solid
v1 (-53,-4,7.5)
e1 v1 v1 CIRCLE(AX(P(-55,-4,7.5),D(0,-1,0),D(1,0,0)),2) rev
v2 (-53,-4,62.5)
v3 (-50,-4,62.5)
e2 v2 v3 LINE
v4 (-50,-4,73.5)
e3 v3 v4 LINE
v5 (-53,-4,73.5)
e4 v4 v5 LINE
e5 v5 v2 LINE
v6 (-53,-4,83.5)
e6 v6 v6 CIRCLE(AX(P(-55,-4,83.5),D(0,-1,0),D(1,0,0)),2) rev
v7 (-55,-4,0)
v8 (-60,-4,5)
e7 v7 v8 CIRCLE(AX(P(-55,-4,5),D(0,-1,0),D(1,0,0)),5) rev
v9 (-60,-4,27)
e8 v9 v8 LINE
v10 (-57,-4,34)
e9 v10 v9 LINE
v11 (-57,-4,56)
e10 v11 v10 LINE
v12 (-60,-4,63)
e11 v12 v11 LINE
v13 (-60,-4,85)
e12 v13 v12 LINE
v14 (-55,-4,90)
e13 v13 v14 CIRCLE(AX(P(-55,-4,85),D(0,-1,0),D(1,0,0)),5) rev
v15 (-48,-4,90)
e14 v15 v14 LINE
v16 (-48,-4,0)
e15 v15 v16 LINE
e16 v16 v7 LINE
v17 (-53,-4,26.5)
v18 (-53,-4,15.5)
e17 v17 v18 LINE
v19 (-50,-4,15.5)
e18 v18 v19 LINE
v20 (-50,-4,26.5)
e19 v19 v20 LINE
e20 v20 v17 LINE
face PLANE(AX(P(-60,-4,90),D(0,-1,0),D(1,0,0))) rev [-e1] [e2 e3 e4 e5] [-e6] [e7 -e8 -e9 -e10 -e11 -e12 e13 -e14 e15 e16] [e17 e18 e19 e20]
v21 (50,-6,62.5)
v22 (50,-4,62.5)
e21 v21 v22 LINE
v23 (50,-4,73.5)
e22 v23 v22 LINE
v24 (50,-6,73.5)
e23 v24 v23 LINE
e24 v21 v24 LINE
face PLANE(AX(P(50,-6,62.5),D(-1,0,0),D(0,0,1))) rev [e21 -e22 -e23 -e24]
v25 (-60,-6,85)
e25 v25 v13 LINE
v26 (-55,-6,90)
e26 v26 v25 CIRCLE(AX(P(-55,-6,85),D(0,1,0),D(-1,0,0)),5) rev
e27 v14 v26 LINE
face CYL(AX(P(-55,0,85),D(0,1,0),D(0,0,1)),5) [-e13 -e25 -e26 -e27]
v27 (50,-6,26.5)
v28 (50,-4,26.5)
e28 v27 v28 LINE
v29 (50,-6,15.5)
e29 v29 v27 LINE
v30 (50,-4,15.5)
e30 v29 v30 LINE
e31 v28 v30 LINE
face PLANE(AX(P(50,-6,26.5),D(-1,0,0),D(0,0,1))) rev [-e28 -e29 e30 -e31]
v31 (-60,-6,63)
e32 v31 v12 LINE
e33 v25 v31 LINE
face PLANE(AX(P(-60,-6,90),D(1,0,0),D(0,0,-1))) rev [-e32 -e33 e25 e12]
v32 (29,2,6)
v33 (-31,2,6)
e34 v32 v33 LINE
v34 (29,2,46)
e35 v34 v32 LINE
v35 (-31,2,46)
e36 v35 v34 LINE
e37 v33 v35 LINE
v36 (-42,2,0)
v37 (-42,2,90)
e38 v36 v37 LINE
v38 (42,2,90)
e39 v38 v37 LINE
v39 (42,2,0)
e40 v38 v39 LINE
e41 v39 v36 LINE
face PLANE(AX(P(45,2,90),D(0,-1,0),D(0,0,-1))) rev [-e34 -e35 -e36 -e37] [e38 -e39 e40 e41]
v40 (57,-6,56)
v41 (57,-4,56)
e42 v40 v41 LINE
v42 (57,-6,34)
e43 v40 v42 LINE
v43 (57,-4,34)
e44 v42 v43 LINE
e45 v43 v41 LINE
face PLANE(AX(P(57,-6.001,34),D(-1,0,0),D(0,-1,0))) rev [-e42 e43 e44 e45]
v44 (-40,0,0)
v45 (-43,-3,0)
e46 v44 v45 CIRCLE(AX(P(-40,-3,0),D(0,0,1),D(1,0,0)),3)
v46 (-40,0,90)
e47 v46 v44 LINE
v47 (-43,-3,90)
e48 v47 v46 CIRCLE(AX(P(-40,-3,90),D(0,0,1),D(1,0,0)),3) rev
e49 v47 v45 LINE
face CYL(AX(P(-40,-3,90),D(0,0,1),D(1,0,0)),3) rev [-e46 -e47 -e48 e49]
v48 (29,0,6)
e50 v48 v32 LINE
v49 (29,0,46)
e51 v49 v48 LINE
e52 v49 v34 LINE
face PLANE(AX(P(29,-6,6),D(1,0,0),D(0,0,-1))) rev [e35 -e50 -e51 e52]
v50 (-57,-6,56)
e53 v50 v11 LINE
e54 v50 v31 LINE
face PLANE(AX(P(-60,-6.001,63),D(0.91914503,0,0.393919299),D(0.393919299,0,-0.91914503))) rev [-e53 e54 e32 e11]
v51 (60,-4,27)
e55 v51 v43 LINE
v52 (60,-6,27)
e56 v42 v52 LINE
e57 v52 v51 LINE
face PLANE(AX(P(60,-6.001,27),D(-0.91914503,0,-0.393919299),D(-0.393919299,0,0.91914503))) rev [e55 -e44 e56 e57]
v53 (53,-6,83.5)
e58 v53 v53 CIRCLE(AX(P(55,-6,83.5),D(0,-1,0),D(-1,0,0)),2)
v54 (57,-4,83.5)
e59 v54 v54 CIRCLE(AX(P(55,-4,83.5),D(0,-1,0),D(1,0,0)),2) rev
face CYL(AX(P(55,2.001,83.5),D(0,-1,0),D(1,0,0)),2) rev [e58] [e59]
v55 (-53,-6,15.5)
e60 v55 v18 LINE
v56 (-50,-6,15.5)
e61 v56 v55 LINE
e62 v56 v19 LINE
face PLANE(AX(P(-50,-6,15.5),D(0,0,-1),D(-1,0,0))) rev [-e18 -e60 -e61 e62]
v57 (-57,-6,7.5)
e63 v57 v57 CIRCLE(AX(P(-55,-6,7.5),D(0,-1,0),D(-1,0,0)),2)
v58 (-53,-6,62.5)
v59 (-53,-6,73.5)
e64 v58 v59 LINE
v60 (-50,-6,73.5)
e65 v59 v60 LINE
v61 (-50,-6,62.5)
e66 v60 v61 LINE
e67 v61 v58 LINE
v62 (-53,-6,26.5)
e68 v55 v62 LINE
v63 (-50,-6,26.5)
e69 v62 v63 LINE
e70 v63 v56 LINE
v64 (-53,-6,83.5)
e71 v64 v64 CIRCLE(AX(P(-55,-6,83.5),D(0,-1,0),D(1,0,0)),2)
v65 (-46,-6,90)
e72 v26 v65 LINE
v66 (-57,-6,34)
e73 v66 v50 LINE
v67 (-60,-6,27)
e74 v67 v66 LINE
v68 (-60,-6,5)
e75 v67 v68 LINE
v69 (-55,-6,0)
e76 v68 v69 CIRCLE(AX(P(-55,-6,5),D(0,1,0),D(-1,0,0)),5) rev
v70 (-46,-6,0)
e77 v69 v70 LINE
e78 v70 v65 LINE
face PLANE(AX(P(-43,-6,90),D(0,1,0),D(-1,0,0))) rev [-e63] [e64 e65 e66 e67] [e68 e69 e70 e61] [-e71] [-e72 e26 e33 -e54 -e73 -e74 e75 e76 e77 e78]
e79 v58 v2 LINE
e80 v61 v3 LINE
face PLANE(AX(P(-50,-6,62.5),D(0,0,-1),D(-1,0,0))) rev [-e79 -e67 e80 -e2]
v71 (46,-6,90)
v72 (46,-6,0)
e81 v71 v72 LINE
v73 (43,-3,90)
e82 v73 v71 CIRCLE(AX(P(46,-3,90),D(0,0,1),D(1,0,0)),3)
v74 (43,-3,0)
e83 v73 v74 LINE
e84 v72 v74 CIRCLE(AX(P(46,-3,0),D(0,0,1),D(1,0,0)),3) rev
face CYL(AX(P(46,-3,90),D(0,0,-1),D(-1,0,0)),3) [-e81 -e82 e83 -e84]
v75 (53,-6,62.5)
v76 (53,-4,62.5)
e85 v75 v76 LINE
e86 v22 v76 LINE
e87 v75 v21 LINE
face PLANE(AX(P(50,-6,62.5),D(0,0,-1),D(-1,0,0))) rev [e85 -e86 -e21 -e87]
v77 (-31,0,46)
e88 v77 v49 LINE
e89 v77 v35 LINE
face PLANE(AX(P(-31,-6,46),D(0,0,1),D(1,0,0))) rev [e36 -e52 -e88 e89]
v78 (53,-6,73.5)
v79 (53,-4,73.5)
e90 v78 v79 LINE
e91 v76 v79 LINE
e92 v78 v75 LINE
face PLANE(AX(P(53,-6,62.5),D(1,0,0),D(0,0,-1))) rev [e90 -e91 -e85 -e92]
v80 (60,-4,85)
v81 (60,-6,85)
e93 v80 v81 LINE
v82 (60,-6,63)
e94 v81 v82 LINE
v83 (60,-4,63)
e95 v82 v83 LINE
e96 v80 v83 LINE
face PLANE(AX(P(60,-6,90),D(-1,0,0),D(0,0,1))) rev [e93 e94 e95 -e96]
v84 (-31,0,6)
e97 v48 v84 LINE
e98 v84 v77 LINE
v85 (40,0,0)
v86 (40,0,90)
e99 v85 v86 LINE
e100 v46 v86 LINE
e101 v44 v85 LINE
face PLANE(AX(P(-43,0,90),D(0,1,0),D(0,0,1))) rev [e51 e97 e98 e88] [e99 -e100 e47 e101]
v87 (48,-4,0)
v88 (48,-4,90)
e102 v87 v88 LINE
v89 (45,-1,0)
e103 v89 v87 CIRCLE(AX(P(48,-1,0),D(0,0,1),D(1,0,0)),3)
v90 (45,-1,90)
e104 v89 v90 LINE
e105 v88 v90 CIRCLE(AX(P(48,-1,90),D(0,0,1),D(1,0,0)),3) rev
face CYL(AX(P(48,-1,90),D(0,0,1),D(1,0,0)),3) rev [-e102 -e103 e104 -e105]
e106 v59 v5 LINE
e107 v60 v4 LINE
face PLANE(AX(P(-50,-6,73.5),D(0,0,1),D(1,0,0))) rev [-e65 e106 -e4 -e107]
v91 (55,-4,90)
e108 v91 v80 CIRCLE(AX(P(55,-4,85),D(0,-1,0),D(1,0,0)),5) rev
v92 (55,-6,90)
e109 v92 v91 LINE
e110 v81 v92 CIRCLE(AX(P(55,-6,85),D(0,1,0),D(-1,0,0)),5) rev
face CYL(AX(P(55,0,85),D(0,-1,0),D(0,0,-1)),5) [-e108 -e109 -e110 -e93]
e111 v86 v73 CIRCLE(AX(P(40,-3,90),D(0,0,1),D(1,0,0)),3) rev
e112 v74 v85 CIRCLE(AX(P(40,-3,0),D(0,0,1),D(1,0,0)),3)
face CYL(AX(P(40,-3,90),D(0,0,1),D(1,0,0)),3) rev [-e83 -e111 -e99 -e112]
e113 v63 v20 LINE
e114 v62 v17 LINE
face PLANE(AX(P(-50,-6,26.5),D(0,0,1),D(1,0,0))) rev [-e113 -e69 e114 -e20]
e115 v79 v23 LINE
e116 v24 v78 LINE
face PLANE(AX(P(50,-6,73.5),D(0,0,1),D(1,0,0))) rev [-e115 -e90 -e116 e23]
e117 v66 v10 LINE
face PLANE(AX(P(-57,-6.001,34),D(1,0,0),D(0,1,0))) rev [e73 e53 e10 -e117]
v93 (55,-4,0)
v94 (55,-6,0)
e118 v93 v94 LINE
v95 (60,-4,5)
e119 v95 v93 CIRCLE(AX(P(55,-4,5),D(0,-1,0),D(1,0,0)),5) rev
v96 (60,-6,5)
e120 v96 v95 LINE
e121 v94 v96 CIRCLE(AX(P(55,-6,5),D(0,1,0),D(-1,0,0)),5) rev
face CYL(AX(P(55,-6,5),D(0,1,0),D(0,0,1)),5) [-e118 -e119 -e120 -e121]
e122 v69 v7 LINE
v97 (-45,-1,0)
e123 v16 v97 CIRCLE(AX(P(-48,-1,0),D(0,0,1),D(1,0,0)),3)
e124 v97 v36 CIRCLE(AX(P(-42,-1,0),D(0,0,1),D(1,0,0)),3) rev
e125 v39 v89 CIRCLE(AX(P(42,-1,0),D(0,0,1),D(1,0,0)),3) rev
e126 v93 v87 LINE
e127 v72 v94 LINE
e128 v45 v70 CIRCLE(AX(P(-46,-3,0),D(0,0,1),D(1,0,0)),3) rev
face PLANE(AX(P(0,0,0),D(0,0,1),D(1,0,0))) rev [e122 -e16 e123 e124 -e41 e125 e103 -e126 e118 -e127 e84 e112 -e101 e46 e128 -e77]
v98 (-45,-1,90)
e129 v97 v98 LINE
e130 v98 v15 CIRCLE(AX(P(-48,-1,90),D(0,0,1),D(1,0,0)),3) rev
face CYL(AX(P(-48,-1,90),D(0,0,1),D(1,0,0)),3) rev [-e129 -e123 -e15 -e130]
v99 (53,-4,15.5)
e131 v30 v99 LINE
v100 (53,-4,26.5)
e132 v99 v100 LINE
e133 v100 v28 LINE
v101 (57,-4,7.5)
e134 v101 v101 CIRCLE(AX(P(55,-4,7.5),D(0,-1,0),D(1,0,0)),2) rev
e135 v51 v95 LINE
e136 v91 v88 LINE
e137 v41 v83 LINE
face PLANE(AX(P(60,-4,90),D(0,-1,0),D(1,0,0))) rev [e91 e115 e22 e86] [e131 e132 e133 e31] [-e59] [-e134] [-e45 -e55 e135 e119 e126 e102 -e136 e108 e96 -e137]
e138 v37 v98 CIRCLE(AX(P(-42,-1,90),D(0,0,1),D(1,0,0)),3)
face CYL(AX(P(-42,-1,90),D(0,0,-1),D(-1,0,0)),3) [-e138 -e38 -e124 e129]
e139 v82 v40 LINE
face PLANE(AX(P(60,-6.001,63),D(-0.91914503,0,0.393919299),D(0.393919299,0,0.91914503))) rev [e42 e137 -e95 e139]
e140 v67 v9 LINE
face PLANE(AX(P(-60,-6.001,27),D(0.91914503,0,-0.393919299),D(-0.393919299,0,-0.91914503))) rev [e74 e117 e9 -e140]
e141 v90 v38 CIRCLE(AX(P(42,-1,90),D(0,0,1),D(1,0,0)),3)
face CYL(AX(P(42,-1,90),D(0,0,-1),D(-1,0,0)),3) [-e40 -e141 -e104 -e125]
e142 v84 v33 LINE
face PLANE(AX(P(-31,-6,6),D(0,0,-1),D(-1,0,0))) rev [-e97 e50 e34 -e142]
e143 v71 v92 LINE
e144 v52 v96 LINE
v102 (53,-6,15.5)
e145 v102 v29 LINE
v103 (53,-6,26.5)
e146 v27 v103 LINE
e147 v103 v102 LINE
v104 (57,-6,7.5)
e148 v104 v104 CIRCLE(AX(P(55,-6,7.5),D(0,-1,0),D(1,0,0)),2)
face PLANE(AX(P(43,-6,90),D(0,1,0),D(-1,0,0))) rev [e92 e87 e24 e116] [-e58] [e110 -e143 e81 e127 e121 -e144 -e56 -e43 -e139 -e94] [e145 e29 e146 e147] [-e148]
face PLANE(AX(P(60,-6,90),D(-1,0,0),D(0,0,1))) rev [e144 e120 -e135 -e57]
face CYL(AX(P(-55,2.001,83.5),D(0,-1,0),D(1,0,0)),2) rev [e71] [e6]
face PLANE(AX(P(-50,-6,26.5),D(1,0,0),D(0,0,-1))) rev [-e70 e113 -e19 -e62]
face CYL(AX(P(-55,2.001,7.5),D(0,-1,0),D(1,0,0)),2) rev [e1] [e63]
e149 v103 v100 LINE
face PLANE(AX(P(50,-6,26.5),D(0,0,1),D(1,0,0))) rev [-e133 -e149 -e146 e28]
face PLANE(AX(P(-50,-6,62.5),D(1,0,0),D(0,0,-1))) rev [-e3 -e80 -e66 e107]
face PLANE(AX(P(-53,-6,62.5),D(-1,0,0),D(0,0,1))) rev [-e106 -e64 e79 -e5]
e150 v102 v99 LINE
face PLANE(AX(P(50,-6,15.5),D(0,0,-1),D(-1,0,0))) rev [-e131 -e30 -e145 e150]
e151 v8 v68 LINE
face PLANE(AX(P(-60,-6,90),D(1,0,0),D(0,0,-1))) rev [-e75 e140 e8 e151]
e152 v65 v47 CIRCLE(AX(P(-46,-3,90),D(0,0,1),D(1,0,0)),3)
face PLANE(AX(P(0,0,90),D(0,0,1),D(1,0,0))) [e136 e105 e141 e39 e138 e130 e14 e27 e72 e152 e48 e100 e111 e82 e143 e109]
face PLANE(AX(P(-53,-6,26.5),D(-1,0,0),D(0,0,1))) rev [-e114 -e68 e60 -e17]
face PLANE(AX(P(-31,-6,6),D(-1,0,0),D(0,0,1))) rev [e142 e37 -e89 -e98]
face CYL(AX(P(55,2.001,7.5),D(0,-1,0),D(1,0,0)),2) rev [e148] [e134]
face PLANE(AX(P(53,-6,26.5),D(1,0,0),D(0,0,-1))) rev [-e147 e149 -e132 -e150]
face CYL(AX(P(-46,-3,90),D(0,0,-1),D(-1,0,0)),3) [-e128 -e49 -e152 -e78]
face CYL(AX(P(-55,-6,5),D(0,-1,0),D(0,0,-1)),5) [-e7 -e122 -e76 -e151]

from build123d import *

# Parameters (mm, degrees)
EXTRUDE_1_DEPTH     = 90
SKETCH_2_W          = 3
SKETCH_2_H          = 11
SKETCH_2_W_2        = 60
SKETCH_2_H_2        = 40
CUT_EXTRUDE_1_DEPTH = 109.461974904
CUT_EXTRUDE_2_REACH = 110.462
SKETCH_3_R          = 2
FILLET_1_R          = 5
FILLET_2_DEPTH      = 90
FILLET_2_2_DEPTH    = 90
CUT_EXTRUDE_3_REACH = 110.333


with BuildPart() as part:
    # 草图1 → 凸台-拉伸1 (new body)
    with BuildSketch(Plane.XY):
        Polygon((-43, 0), (43, 0), (43, -6), (60, -6), (60, -4), (45, -4), (45, 2), (-45, 2), (-45, -4), (-60, -4), (-60, -6), (-43, -6), align=None)
    extrude(amount=EXTRUDE_1_DEPTH)

    # 草图2 → 切除-拉伸1 (cut, through all)
    with BuildSketch(Plane(origin=(0, 2, 0), x_dir=(1, 0, 0), z_dir=(0, 1, 0))):
        with Locations((51.5, -21)):
            Rectangle(SKETCH_2_W, SKETCH_2_H)
        with Locations((51.5, -68)):
            Rectangle(SKETCH_2_W, SKETCH_2_H)
        with Locations((-51.5, -21)):
            Rectangle(SKETCH_2_W, SKETCH_2_H)
        with Locations((-51.5, -68)):
            Rectangle(SKETCH_2_W, SKETCH_2_H)
        with Locations((-1, -26)):
            Rectangle(SKETCH_2_W_2, SKETCH_2_H_2)
    extrude(amount=-CUT_EXTRUDE_1_DEPTH, mode=Mode.SUBTRACT)

    # 草图3 → 切除-拉伸2 (cut, up to next)
    with BuildSketch(Plane.XZ.offset(6), mode=Mode.PRIVATE) as cut_extrude_2_sk1:
        with Locations((55, 7.5)):
            Circle(SKETCH_3_R)
    cut_extrude_2_tool1 = extrude(cut_extrude_2_sk1.sketch, amount=-CUT_EXTRUDE_2_REACH, mode=Mode.PRIVATE) & part.part
    # 草图3 → 切除-拉伸2 (cut, up to next)
    with BuildSketch(Plane.XZ.offset(6), mode=Mode.PRIVATE) as cut_extrude_2_sk2:
        with Locations((55, 83.5)):
            Circle(SKETCH_3_R)
    cut_extrude_2_tool2 = extrude(cut_extrude_2_sk2.sketch, amount=-CUT_EXTRUDE_2_REACH, mode=Mode.PRIVATE) & part.part
    # 草图3 → 切除-拉伸2 (cut, up to next)
    with BuildSketch(Plane.XZ.offset(6), mode=Mode.PRIVATE) as cut_extrude_2_sk3:
        with Locations((-55, 83.5)):
            Circle(SKETCH_3_R)
    cut_extrude_2_tool3 = extrude(cut_extrude_2_sk3.sketch, amount=-CUT_EXTRUDE_2_REACH, mode=Mode.PRIVATE) & part.part
    # 草图3 → 切除-拉伸2 (cut, up to next)
    with BuildSketch(Plane.XZ.offset(6), mode=Mode.PRIVATE) as cut_extrude_2_sk4:
        with Locations((-55, 7.5)):
            Circle(SKETCH_3_R)
    cut_extrude_2_tool4 = extrude(cut_extrude_2_sk4.sketch, amount=-CUT_EXTRUDE_2_REACH, mode=Mode.PRIVATE) & part.part
    add(cut_extrude_2_tool1.solids().sort_by_distance((55, -6, 7.5))[0], mode=Mode.SUBTRACT)
    add(cut_extrude_2_tool2.solids().sort_by_distance((55, -6, 83.5))[0], mode=Mode.SUBTRACT)
    add(cut_extrude_2_tool3.solids().sort_by_distance((-55, -6, 83.5))[0], mode=Mode.SUBTRACT)
    add(cut_extrude_2_tool4.solids().sort_by_distance((-55, -6, 7.5))[0], mode=Mode.SUBTRACT)

    # 圆角1
    fillet_1_edges = [part.edges().sort_by_distance(p)[0] for p in [
        (60, -5, 0),
        (-60, -5, 0),
        (60, -5, 90),
        (-60, -5, 90),
    ]]
    fillet(fillet_1_edges, radius=FILLET_1_R)

    # 圆角2: read off the stored shape, not the designer's step
    # 圆角2 outline → 圆角2 (cut)
    with BuildSketch(Plane.XY):
        with BuildLine():
            Line((-43, -6), (-43, -3))
            ThreePointArc((-43, -3), (-43.878679656, -5.121320344), (-46, -6))
            Line((-46, -6), (-43, -6))
        make_face()
        with BuildLine():
            ThreePointArc((46, -6), (43.878679656, -5.121320344), (43, -3))
            Line((43, -3), (43, -6))
            Line((43, -6), (46, -6))
        make_face()
        with BuildLine():
            Line((45, 2), (42, 2))
            ThreePointArc((42, 2), (44.121320344, 1.121320344), (45, -1))
            Line((45, -1), (45, 2))
        make_face()
        with BuildLine():
            ThreePointArc((-45, -1), (-44.121320344, 1.121320344), (-42, 2))
            Line((-42, 2), (-45, 2))
            Line((-45, 2), (-45, -1))
        make_face()
    extrude(amount=FILLET_2_DEPTH, mode=Mode.SUBTRACT)

    # Fillet 2 2 outline → Fillet 2 2 (add)
    with BuildSketch(Plane.XY):
        with BuildLine():
            ThreePointArc((-43, -3), (-42.121320344, -0.878679656), (-40, 0))
            Line((-40, 0), (-43, 0))
            Line((-43, 0), (-43, -3))
        make_face()
        with BuildLine():
            ThreePointArc((40, 0), (42.121320344, -0.878679656), (43, -3))
            Line((43, -3), (43, 0))
            Line((43, 0), (40, 0))
        make_face()
        with BuildLine():
            Line((-45, -4), (-45, -1))
            ThreePointArc((-45, -1), (-45.878679656, -3.121320344), (-48, -4))
            Line((-48, -4), (-45, -4))
        make_face()
        with BuildLine():
            ThreePointArc((48, -4), (45.878679656, -3.121320344), (45, -1))
            Line((45, -1), (45, -4))
            Line((45, -4), (48, -4))
        make_face()
    extrude(amount=FILLET_2_2_DEPTH)

    # 草图4 → 切除-拉伸3 (cut, up to next)
    with BuildSketch(Plane(origin=(0, -4, 0), x_dir=(1, 0, 0), z_dir=(0, 1, 0)), mode=Mode.PRIVATE) as cut_extrude_3_sk1:
        Polygon((60, -27), (57, -34), (57, -56), (60, -63), align=None)
    cut_extrude_3_tool1 = extrude(cut_extrude_3_sk1.sketch, amount=-CUT_EXTRUDE_3_REACH, mode=Mode.PRIVATE) & part.part
    # 草图4 → 切除-拉伸3 (cut, up to next)
    with BuildSketch(Plane(origin=(0, -4, 0), x_dir=(1, 0, 0), z_dir=(0, 1, 0)), mode=Mode.PRIVATE) as cut_extrude_3_sk2:
        Polygon((-60, -63), (-57, -56), (-57, -34), (-60, -27), align=None)
    cut_extrude_3_tool2 = extrude(cut_extrude_3_sk2.sketch, amount=-CUT_EXTRUDE_3_REACH, mode=Mode.PRIVATE) & part.part
    add(cut_extrude_3_tool1.solids().sort_by_distance((58.62069, -4, 45))[0], mode=Mode.SUBTRACT)
    add(cut_extrude_3_tool2.solids().sort_by_distance((-58.62069, -4, 45))[0], mode=Mode.SUBTRACT)


solid = part.part
